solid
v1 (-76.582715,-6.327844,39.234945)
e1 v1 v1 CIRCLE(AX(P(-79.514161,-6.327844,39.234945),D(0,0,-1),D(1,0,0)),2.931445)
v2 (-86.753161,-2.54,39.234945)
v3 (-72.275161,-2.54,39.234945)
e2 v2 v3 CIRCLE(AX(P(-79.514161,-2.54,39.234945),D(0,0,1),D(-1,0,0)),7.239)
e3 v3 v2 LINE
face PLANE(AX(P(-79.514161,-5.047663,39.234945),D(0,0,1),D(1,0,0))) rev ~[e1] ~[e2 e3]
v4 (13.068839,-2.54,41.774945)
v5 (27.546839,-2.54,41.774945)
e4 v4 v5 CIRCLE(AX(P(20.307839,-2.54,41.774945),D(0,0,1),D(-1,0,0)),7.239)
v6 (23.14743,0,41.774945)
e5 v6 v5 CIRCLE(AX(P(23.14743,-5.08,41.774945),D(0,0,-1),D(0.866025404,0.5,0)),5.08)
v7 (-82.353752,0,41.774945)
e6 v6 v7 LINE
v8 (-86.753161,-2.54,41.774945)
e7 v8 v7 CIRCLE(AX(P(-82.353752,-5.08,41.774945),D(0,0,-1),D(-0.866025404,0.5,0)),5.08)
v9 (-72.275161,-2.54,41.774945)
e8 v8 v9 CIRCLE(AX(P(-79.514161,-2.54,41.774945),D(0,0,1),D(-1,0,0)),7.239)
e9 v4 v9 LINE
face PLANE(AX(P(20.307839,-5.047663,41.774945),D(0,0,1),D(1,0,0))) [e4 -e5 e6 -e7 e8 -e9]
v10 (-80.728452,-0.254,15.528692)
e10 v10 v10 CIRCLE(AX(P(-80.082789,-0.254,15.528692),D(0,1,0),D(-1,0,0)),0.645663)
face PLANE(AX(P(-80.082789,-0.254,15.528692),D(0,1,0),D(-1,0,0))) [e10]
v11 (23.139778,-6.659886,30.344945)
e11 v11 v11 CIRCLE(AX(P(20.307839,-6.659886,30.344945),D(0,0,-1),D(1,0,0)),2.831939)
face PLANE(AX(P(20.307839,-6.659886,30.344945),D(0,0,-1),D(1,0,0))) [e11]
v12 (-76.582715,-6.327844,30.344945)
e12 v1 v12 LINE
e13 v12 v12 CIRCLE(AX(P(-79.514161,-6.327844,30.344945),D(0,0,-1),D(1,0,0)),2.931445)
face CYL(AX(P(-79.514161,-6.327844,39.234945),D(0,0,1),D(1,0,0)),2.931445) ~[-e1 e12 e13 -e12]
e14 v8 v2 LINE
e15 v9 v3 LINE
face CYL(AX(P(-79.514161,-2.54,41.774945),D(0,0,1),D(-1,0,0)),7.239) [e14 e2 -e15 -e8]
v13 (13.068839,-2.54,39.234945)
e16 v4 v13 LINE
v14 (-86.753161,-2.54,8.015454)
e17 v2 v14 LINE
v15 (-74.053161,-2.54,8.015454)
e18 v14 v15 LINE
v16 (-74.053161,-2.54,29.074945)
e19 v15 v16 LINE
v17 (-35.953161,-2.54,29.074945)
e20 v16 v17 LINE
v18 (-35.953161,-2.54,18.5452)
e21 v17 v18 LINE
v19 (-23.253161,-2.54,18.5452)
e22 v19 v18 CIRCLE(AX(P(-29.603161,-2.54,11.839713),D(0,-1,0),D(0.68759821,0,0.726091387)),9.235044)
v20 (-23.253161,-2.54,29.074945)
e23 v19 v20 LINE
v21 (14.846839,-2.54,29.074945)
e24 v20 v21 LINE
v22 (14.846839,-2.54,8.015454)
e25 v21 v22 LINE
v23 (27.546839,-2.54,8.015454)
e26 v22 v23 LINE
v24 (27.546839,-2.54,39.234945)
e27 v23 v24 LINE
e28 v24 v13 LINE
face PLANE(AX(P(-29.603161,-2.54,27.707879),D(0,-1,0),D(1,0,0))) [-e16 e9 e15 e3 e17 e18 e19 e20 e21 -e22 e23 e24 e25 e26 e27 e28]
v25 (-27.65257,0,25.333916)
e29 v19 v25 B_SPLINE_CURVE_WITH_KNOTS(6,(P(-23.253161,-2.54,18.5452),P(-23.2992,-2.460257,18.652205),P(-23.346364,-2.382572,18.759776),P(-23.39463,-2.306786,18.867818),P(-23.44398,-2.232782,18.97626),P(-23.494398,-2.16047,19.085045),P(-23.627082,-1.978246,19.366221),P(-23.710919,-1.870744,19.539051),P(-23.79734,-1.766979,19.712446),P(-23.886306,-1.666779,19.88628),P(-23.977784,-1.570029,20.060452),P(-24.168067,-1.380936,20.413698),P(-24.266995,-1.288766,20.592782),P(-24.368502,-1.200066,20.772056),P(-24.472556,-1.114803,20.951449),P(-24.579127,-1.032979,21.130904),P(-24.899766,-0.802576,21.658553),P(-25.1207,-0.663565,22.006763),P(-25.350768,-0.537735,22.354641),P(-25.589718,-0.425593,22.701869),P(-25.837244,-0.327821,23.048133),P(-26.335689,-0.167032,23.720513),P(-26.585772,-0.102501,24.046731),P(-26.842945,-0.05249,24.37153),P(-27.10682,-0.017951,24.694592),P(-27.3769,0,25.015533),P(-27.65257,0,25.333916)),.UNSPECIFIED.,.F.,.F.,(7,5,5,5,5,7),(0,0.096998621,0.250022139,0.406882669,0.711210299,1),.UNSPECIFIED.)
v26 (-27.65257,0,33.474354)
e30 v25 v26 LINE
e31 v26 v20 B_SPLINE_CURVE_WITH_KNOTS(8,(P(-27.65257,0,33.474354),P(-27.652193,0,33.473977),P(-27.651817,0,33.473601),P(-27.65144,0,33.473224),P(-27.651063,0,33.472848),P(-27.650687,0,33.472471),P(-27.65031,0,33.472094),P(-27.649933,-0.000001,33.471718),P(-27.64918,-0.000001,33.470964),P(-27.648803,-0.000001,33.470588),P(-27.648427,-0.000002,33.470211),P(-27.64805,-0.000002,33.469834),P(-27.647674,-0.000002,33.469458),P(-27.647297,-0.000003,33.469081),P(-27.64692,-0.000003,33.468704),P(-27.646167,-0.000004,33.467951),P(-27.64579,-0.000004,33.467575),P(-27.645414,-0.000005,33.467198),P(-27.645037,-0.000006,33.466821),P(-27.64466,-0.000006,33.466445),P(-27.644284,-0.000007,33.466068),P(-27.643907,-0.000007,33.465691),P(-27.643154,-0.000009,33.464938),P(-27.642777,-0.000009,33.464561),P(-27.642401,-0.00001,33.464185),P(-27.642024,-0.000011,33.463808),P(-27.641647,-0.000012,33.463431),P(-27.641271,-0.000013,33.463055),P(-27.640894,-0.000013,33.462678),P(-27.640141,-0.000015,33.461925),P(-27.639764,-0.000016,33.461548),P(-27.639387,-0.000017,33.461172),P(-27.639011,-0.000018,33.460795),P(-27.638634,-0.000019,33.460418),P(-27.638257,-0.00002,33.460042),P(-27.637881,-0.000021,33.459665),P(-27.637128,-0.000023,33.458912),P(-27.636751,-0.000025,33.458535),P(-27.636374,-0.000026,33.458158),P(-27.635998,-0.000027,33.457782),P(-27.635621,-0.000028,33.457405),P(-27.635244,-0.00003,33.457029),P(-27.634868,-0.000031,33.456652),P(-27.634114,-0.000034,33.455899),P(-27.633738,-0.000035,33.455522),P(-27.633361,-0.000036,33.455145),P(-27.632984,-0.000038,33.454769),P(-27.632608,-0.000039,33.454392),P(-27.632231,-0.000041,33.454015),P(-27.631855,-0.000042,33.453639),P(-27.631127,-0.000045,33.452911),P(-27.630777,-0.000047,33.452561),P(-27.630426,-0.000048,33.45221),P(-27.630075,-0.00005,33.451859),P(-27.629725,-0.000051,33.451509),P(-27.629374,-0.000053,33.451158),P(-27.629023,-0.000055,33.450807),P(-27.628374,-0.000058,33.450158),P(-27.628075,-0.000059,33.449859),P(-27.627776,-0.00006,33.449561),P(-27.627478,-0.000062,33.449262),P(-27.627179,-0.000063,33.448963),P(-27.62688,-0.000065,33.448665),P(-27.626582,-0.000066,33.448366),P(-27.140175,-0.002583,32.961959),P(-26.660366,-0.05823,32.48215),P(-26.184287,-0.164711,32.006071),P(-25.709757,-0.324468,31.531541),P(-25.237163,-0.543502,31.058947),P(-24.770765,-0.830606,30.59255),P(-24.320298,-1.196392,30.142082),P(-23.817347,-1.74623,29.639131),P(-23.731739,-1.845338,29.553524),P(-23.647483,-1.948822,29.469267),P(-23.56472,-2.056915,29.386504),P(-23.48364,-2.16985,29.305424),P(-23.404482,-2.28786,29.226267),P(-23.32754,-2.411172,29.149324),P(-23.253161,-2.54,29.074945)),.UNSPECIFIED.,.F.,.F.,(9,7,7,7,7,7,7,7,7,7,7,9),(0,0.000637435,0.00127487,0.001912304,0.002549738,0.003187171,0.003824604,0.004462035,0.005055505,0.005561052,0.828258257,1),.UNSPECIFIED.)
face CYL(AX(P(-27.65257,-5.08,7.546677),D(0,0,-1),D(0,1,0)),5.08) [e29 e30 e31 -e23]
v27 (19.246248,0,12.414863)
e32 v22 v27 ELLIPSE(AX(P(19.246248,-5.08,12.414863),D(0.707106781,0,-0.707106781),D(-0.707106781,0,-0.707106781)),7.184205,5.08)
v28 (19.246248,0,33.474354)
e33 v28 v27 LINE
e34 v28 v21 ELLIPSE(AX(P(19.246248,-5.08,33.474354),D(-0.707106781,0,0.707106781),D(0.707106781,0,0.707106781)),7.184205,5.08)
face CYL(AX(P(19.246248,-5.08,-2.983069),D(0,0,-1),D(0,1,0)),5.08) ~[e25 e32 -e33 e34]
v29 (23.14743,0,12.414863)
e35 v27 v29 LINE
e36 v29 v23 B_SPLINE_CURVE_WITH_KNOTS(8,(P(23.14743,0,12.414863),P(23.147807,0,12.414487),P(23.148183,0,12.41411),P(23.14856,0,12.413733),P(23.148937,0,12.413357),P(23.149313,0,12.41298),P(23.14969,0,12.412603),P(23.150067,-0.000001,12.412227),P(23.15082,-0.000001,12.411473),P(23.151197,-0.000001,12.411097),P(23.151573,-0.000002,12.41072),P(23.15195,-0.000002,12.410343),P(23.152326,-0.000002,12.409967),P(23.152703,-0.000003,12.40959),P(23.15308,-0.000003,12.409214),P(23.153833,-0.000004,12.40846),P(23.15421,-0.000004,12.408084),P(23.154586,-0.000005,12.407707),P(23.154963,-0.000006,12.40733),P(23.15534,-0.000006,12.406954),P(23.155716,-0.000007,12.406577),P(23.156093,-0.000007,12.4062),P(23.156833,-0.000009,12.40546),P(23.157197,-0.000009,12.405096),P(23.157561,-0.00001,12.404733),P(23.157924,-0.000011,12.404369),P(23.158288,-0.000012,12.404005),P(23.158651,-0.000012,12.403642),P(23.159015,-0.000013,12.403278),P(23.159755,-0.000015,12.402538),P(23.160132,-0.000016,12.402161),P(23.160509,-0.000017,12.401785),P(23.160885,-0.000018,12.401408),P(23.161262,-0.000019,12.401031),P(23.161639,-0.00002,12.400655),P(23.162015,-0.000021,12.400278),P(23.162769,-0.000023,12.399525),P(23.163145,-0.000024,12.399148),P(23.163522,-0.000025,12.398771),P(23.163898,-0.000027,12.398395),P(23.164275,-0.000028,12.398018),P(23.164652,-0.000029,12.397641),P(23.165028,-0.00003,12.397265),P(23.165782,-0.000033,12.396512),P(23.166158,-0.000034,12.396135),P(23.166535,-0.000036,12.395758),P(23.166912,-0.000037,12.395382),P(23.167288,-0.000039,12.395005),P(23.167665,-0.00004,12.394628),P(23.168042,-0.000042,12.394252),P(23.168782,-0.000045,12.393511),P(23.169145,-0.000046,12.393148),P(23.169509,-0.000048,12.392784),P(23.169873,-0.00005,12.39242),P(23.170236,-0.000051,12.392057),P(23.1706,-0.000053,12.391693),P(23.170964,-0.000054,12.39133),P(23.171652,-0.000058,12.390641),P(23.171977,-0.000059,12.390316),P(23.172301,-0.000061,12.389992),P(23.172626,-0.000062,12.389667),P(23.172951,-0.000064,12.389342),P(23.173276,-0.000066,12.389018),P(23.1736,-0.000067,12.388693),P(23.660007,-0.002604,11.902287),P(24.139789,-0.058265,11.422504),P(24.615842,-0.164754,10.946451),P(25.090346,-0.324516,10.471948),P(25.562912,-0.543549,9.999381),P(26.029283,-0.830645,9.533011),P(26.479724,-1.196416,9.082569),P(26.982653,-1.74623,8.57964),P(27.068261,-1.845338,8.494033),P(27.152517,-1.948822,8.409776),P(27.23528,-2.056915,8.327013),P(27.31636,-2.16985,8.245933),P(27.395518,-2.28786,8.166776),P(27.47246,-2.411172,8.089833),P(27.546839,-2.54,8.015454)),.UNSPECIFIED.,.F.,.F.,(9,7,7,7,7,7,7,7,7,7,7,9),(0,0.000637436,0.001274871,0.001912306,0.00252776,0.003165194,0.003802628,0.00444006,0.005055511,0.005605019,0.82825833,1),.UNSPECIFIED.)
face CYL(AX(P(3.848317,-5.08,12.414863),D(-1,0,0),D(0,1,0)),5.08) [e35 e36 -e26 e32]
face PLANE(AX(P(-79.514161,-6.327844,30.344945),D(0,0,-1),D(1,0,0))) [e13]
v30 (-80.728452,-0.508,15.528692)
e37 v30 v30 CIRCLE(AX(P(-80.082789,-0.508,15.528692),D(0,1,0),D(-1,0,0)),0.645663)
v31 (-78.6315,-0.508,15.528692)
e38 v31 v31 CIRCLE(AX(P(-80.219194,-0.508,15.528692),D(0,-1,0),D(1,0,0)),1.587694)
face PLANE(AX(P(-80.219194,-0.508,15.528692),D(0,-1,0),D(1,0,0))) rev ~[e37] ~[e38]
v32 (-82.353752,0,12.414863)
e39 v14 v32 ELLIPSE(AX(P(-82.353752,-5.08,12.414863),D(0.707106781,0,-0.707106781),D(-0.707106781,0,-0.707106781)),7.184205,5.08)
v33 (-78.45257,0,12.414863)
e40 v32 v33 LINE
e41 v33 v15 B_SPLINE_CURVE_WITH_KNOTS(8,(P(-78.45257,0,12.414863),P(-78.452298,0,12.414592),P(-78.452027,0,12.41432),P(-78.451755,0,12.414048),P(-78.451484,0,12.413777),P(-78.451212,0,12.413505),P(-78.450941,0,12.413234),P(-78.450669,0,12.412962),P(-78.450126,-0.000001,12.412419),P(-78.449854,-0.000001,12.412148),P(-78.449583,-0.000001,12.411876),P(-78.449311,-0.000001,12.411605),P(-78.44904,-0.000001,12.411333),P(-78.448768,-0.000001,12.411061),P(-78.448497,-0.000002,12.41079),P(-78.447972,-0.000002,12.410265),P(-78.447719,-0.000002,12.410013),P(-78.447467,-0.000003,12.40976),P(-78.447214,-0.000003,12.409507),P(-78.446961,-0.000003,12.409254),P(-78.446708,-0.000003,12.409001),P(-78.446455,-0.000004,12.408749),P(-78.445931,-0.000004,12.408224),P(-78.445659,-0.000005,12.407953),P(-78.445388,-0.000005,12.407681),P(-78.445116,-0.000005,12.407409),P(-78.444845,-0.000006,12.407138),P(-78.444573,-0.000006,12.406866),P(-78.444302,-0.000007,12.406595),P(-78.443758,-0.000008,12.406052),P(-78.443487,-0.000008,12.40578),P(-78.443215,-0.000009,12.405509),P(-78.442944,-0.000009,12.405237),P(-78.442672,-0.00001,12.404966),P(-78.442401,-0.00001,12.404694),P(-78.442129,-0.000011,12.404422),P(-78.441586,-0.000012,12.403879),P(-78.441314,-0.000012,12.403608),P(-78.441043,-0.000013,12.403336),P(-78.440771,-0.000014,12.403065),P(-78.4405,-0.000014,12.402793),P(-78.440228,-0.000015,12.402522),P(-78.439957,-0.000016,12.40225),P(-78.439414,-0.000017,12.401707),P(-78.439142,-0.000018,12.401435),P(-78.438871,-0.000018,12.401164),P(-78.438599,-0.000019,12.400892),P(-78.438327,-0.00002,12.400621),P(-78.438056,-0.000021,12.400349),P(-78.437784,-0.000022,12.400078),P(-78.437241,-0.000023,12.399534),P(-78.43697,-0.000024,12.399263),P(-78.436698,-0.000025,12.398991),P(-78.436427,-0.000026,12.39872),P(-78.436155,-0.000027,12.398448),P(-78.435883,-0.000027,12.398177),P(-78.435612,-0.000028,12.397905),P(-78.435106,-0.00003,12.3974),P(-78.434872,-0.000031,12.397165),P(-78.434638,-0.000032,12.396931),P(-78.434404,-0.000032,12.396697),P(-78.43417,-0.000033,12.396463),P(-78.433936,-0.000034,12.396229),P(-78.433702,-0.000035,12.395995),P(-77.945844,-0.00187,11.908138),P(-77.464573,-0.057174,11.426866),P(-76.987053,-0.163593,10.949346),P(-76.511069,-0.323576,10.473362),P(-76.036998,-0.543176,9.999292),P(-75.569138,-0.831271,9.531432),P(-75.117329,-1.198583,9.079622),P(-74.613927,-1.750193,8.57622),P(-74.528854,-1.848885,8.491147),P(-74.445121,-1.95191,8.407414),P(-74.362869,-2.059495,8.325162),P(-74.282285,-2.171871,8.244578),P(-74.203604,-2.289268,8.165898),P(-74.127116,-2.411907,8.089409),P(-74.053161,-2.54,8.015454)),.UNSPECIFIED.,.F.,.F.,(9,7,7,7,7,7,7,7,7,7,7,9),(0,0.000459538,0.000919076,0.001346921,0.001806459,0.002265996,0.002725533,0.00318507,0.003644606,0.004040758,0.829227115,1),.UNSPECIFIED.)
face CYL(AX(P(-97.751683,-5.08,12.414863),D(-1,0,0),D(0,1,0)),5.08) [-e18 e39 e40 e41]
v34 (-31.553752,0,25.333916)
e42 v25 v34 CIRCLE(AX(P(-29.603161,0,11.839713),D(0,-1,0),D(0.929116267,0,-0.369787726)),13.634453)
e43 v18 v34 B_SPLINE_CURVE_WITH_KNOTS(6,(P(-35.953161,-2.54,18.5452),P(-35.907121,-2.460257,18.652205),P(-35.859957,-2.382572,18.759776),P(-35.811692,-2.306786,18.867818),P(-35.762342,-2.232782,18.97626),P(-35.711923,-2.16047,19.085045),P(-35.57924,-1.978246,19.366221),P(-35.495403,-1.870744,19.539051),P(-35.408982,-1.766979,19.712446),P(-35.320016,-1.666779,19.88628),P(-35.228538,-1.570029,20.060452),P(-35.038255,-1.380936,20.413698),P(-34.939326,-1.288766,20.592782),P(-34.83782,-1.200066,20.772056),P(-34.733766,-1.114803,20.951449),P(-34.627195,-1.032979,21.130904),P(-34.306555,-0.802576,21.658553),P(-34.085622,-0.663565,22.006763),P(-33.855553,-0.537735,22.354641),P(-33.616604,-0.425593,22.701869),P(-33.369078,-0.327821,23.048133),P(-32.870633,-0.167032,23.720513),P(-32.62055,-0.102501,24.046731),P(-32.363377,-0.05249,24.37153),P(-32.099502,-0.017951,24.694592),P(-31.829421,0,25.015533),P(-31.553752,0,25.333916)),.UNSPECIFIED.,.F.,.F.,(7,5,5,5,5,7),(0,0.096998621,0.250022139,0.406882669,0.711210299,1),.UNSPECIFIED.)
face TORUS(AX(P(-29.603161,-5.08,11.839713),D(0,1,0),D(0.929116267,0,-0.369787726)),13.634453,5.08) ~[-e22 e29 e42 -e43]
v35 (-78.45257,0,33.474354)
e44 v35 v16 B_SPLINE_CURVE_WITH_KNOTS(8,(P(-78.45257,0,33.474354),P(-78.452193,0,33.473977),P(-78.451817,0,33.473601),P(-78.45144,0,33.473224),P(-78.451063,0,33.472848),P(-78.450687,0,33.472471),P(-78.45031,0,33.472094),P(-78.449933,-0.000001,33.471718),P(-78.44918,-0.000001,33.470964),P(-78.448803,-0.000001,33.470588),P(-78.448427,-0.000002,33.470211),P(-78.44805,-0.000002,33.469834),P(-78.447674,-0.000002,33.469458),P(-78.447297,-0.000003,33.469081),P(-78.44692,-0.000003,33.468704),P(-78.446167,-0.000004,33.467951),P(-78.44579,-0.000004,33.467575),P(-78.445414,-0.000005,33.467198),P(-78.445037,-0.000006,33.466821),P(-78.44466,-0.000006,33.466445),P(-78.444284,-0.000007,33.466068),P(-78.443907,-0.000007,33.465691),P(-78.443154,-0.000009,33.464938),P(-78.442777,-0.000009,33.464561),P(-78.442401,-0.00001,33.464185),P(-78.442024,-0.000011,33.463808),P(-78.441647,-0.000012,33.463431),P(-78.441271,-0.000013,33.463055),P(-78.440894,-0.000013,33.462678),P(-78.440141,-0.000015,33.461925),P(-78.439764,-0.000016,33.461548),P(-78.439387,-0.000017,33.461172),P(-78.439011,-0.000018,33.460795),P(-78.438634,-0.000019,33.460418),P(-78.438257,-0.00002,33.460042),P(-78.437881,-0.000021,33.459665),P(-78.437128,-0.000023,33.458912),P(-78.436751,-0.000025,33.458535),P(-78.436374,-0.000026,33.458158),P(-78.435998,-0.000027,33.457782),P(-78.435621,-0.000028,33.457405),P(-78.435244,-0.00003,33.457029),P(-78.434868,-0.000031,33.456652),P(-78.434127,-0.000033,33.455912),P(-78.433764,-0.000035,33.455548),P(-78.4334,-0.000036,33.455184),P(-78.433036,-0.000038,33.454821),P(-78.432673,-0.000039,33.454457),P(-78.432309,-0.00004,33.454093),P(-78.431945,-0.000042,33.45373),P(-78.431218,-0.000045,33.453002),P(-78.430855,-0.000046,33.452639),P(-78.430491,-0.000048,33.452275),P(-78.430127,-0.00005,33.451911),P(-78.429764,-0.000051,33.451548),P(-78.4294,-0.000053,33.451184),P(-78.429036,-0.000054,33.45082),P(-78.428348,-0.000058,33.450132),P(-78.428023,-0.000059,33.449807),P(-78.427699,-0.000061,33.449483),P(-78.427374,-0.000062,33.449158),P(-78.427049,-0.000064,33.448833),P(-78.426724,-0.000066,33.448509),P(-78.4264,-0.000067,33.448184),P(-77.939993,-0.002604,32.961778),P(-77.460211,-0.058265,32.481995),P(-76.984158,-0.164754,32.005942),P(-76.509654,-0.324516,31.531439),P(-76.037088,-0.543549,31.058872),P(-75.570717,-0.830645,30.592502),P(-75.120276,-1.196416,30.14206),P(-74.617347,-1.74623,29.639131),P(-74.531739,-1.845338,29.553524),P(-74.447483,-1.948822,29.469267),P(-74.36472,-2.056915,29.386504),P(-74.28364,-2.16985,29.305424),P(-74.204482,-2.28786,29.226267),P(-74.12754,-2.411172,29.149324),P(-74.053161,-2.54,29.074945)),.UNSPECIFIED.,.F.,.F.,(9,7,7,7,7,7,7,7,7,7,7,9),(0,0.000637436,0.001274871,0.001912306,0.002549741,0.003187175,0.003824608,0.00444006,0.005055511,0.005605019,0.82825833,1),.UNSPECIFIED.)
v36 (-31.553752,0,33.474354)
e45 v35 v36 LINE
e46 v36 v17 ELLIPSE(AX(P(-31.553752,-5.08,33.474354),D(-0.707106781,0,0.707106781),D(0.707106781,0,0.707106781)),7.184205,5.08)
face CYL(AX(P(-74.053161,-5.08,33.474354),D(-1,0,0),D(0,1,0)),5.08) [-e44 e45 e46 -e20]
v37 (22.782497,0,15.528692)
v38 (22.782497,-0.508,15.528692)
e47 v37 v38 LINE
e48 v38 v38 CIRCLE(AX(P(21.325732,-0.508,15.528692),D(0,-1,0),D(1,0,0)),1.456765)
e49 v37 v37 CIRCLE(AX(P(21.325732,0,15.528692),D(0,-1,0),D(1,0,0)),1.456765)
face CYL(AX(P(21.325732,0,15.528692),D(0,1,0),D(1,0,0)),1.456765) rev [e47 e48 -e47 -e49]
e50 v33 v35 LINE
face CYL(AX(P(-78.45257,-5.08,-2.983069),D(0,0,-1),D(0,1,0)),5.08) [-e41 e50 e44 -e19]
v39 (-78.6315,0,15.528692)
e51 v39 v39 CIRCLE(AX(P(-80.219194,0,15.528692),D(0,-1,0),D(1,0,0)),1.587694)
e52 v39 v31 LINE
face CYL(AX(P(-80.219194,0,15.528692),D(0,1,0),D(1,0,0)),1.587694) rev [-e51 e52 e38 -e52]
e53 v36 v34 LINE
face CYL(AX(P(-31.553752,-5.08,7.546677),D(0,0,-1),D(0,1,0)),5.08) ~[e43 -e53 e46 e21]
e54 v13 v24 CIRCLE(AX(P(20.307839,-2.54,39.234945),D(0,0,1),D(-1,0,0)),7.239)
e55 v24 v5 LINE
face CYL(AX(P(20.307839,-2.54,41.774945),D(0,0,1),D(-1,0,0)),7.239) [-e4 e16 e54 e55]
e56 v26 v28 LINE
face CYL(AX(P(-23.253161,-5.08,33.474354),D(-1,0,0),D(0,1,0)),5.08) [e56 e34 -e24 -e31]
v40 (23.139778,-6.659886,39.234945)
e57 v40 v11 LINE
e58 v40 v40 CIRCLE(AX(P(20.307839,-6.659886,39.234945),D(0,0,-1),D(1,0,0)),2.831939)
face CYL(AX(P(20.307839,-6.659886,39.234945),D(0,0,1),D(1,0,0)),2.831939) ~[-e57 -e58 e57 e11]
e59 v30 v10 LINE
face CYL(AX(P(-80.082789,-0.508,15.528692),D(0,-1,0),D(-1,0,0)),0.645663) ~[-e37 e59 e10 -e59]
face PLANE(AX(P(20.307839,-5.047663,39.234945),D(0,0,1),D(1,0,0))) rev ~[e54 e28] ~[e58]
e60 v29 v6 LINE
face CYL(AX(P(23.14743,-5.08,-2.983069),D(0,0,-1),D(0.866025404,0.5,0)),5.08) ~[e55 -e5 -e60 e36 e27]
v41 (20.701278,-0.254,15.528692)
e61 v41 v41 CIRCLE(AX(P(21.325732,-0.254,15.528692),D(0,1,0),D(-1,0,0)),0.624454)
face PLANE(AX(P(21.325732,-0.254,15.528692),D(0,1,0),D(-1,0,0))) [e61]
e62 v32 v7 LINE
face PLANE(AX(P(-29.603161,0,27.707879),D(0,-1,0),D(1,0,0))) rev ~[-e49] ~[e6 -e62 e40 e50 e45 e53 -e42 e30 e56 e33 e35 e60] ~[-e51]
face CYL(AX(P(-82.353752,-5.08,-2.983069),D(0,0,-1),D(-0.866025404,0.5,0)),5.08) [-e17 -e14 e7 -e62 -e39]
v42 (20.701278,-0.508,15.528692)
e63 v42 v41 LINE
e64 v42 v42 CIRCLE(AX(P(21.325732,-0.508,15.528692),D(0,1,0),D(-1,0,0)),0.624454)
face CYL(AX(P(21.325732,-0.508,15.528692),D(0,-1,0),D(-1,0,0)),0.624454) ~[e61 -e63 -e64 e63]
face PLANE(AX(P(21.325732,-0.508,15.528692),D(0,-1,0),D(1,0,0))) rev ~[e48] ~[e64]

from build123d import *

# Parameters (mm, degrees)
F1_DEPTH     = 2.54
F3_DEPTH     = 2.54
F4_R         = 2.9314454593
F5_R         = 2.8319389427
F6_DEPTH     = 8.89
F8_DEPTH     = 25.4
F9_T1_DEPTH  = 38.1
F9_T3_DEPTH  = 38.1
F9_T5_DEPTH  = 21.5282681004
F9_T7_DEPTH  = 32.0580135728
F9_T9_DEPTH  = 55.7565362009
F9_T11_DEPTH = 34.6970452561
F9_T13_DEPTH = 34.6970452561
F9_T16_ANGLE = 223.4050528115
F9_T21_DEPTH = 49.0985226281
F9_T25_DEPTH = 32.5267907285
F9_T32_DEPTH = 32.0580135728
F9_T37_DEPTH = 49.0985226281
F9_T44_DEPTH = 49.0985226281
F9_T48_DEPTH = 32.0580135728
F9_T56_DEPTH = 32.5267907285
F9_T60_DEPTH = 49.0985226281
F10_R        = 1.4567648878
F10_R_2      = 1.5876943873
F11_DEPTH    = 0.508
F12_R        = 0.6244535606
F12_R_2      = 0.645662674
F13_DEPTH    = 0.254


# Not quite as in the source:
# - a fillet or chamfer that OpenCascade refuses, or shapes differently, is made with other operations: its cross-section is extruded or revolved along the edge and cut away or added


with BuildPart() as f1:
    # F0 (on Front) → F1 (new body)
    with BuildSketch(Plane.XZ):
        Polygon((27.5468391635, 41.7749450469), (-86.7531608365, 41.7749450469), (-86.7531608365, 8.0154541022), (-74.0531608365, 8.0154541022), (-74.0531608365, 29.0749450469), (-35.9531608365, 29.0749450469), (-35.9531608365, 8.0154541022), (-23.2531608365, 8.0154541022), (-23.2531608365, 29.0749450469), (14.8468391635, 29.0749450469), (14.8468391635, 8.0154541022), (27.5468391635, 8.0154541022), align=None)
    extrude(amount=F1_DEPTH)

    # F2 (on face) → F3 (join)
    with BuildSketch(Plane.XY.offset(41.7749450469)):
        with BuildLine():
            Line((27.5468391635, -2.54), (13.0688391635, -2.54))
            ThreePointArc((13.0688391635, -2.54), (20.3078391635, -9.779), (27.5468391635, -2.54))
        make_face()
        with BuildLine():
            Line((-72.2751608365, -2.54), (-86.7531608365, -2.54))
            ThreePointArc((-86.7531608365, -2.54), (-79.5141608365, -9.779), (-72.2751608365, -2.54))
        make_face()
    extrude(amount=-F3_DEPTH)

    # F4 (on face) + F5 (on face) → F6 (join)
    with BuildSketch(Plane(origin=(0, 0, 39.2349450469), x_dir=(1, 0, 0), z_dir=(0, 0, -1))):
        with Locations((-79.5141608365, 6.3278437592)):
            Circle(F4_R)
    with BuildSketch(Plane(origin=(0, 0, 39.2349450469), x_dir=(1, 0, 0), z_dir=(0, 0, -1))):
        with Locations((20.3078391635, 6.6598863341)):
            Circle(F5_R)
    extrude(amount=F6_DEPTH)

    # F7 (on face) → F8 (cut)
    with BuildSketch(Plane.XZ.offset(2.54)):
        with BuildLine():
            Line((-23.2531608365, 8.0154541022), (-23.2531608365, 18.5451995745))
            ThreePointArc((-23.2531608365, 18.5451995745), (-29.6031608365, 21.0747577819), (-35.9531608365, 18.5451995745))
            Line((-35.9531608365, 18.5451995745), (-35.9531608365, 8.0154541022))
            Line((-35.9531608365, 8.0154541022), (-23.2531608365, 8.0154541022))
        make_face()
    extrude(amount=-F8_DEPTH, mode=Mode.SUBTRACT)

    # F9: fillet of radius 5.08 on 11 edges, made by hand

    # F9_s2 → F9_t1 (cut)
    with BuildSketch(Plane.YZ.offset(-23.2531608365)):
        with BuildLine():
            ThreePointArc((0, 33.4743540981), (-0.6805909488, 30.9343540981), (-2.54, 29.0749450469))
            Line((-2.54, 29.0749450469), (0, 29.0749450469))
            Line((0, 29.0749450469), (0, 33.4743540981))
        make_face()
    extrude(amount=F9_T1_DEPTH, mode=Mode.SUBTRACT)

    # F9_s4 → F9_t3 (cut)
    with BuildSketch(Plane.YZ.offset(-74.0531608365)):
        with BuildLine():
            ThreePointArc((0, 33.4743540981), (-0.6805909488, 30.9343540981), (-2.54, 29.0749450469))
            Line((-2.54, 29.0749450469), (0, 29.0749450469))
            Line((0, 29.0749450469), (0, 33.4743540981))
        make_face()
    extrude(amount=F9_T3_DEPTH, mode=Mode.SUBTRACT)

    # F9_s6 → F9_t5 (cut)
    with BuildSketch(Plane.XY.offset(7.5466769465)):
        with BuildLine():
            ThreePointArc((-31.5537517853, 0), (-34.0937517853, -0.6805909488), (-35.9531608365, -2.54))
            Line((-35.9531608365, -2.54), (-35.9531608365, 0))
            Line((-35.9531608365, 0), (-31.5537517853, 0))
        make_face()
        with BuildLine():
            ThreePointArc((-27.6525698878, 0), (-25.1125698878, -0.6805909488), (-23.2531608365, -2.54))
            Line((-23.2531608365, -2.54), (-23.2531608365, 0))
            Line((-23.2531608365, 0), (-27.6525698878, 0))
        make_face()
    extrude(amount=F9_T5_DEPTH, mode=Mode.SUBTRACT)

    # F9_s8 → F9_t7 (cut)
    with BuildSketch(Plane.XY.offset(-2.9830685259)):
        with BuildLine():
            ThreePointArc((19.2462482147, 0), (16.7062482147, -0.6805909488), (14.8468391635, -2.54))
            Line((14.8468391635, -2.54), (14.8468391635, 0))
            Line((14.8468391635, 0), (19.2462482147, 0))
        make_face()
        with BuildLine():
            ThreePointArc((-78.4525698878, 0), (-75.9125698878, -0.6805909488), (-74.0531608365, -2.54))
            Line((-74.0531608365, -2.54), (-74.0531608365, 0))
            Line((-74.0531608365, 0), (-78.4525698878, 0))
        make_face()
    extrude(amount=F9_T7_DEPTH, mode=Mode.SUBTRACT)

    # F9_s10 → F9_t9 (cut)
    with BuildSketch(Plane.XY.offset(-2.9830685259)):
        with BuildLine():
            ThreePointArc((27.5468391635, -2.54), (25.6874301122, -0.6805909488), (23.1474301122, 0))
            Line((23.1474301122, 0), (27.5468391635, 0))
            Line((27.5468391635, 0), (27.5468391635, -2.54))
        make_face()
        with BuildLine():
            ThreePointArc((-86.7531608365, -2.54), (-84.8937517853, -0.6805909488), (-82.3537517853, 0))
            Line((-82.3537517853, 0), (-86.7531608365, 0))
            Line((-86.7531608365, 0), (-86.7531608365, -2.54))
        make_face()
    extrude(amount=F9_T9_DEPTH, mode=Mode.SUBTRACT)

    # F9_s12 → F9_t11 (cut)
    with BuildSketch(Plane.YZ.offset(-97.7516834646)):
        with BuildLine():
            ThreePointArc((0, 12.4148631534), (-0.6805909488, 9.8748631534), (-2.54, 8.0154541022))
            Line((-2.54, 8.0154541022), (0, 8.0154541022))
            Line((0, 8.0154541022), (0, 12.4148631534))
        make_face()
    extrude(amount=F9_T11_DEPTH, mode=Mode.SUBTRACT)

    # F9_s14 → F9_t13 (cut)
    with BuildSketch(Plane.YZ.offset(3.8483165354)):
        with BuildLine():
            ThreePointArc((0, 12.4148631534), (-0.6805909488, 9.8748631534), (-2.54, 8.0154541022))
            Line((-2.54, 8.0154541022), (0, 8.0154541022))
            Line((0, 8.0154541022), (0, 12.4148631534))
        make_face()
    extrude(amount=F9_T13_DEPTH, mode=Mode.SUBTRACT)

    # F9_s15 → F9_t16 (revolve, cut)
    with BuildSketch(Plane(origin=(0.0198149882, 0, 0.0497864763), x_dir=(0, 1, 0), z_dir=(-0.3697877262, 0, -0.929116267))):
        with BuildLine():
            ThreePointArc((0, -18.2485055237), (-0.6805909488, -20.7885055237), (-2.54, -22.6479145749))
            Line((-2.54, -22.6479145749), (0, -22.6479145749))
            Line((0, -22.6479145749), (0, -18.2485055237))
        make_face()
    revolve(axis=Axis((-29.6031608365, 0, 11.8397133801), (0, -1, 0)), revolution_arc=F9_T16_ANGLE, mode=Mode.SUBTRACT)


with BuildPart() as f9_tool19:
    # F9_s20 → F9_t21 (new body)
    with BuildSketch(Plane.YZ.offset(-34.2516834646)):
        with BuildLine():
            ThreePointArc((0, 33.4743540981), (-0.6805909488, 30.9343540981), (-2.54, 29.0749450469))
            Line((-2.54, 29.0749450469), (0, 29.0749450469))
            Line((0, 29.0749450469), (0, 33.4743540981))
        make_face()
    extrude(amount=F9_T21_DEPTH)

    split(bisect_by=Plane.YZ.offset(-23.2531608365), keep=Keep.BOTTOM)


with BuildPart() as f9_tool23:
    # F9_s24 → F9_t25 (new body)
    with BuildSketch(Plane.XY.offset(7.5466769465)):
        with BuildLine():
            ThreePointArc((-27.6525698878, 0), (-25.1125698878, -0.6805909488), (-23.2531608365, -2.54))
            Line((-23.2531608365, -2.54), (-23.2531608365, 0))
            Line((-23.2531608365, 0), (-27.6525698878, 0))
        make_face()
    extrude(amount=F9_T25_DEPTH)

    split(bisect_by=Plane.XY.offset(29.0749450469), keep=Keep.TOP)


with BuildPart() as f9_tool19_1:
    add(f9_tool19.part)

    # F9_t27: intersect F9_tool23
    add(f9_tool23.part, mode=Mode.INTERSECT)


with BuildPart() as f1_1:
    add(f1.part)

    # F9_t17: cut F9_tool19
    add(f9_tool19_1.part, mode=Mode.SUBTRACT)


with BuildPart() as f9_tool30:
    # F9_s31 → F9_t32 (new body)
    with BuildSketch(Plane.XY.offset(40.073467675)):
        with BuildLine():
            ThreePointArc((19.2462482147, 0), (16.7062482147, -0.6805909488), (14.8468391635, -2.54))
            Line((14.8468391635, -2.54), (14.8468391635, 0))
            Line((14.8468391635, 0), (19.2462482147, 0))
        make_face()
    extrude(amount=-F9_T32_DEPTH)

    split(bisect_by=Plane.XY.offset(39.2349450469), keep=Keep.BOTTOM)

    split(bisect_by=Plane.XY.offset(29.0749450469), keep=Keep.TOP)


with BuildPart() as f9_tool35:
    # F9_s36 → F9_t37 (new body)
    with BuildSketch(Plane.YZ.offset(-23.2531608365)):
        with BuildLine():
            ThreePointArc((0, 33.4743540981), (-0.6805909488, 30.9343540981), (-2.54, 29.0749450469))
            Line((-2.54, 29.0749450469), (0, 29.0749450469))
            Line((0, 29.0749450469), (0, 33.4743540981))
        make_face()
    extrude(amount=F9_T37_DEPTH)

    split(bisect_by=Plane.YZ.offset(14.8468391635), keep=Keep.TOP)


with BuildPart() as f9_tool30_1:
    add(f9_tool30.part)

    # F9_t39: intersect F9_tool35
    add(f9_tool35.part, mode=Mode.INTERSECT)


with BuildPart() as f1_2:
    add(f1_1.part)

    # F9_t28: cut F9_tool30
    add(f9_tool30_1.part, mode=Mode.SUBTRACT)


with BuildPart() as f9_tool42:
    # F9_s43 → F9_t44 (new body)
    with BuildSketch(Plane.YZ.offset(-85.0516834646)):
        with BuildLine():
            ThreePointArc((0, 33.4743540981), (-0.6805909488, 30.9343540981), (-2.54, 29.0749450469))
            Line((-2.54, 29.0749450469), (0, 29.0749450469))
            Line((0, 29.0749450469), (0, 33.4743540981))
        make_face()
    extrude(amount=F9_T44_DEPTH)

    split(bisect_by=Plane.YZ.offset(-74.0531608365), keep=Keep.BOTTOM)


with BuildPart() as f9_tool46:
    # F9_s47 → F9_t48 (new body)
    with BuildSketch(Plane.XY.offset(8.0154541022)):
        with BuildLine():
            ThreePointArc((-78.4525698878, 0), (-75.9125698878, -0.6805909488), (-74.0531608365, -2.54))
            Line((-74.0531608365, -2.54), (-74.0531608365, 0))
            Line((-74.0531608365, 0), (-78.4525698878, 0))
        make_face()
    extrude(amount=F9_T48_DEPTH)

    split(bisect_by=Plane.XY.offset(29.0749450469), keep=Keep.TOP)

    split(bisect_by=Plane.XY.offset(39.2349450469), keep=Keep.BOTTOM)


with BuildPart() as f9_tool42_1:
    add(f9_tool42.part)

    # F9_t51: intersect F9_tool46
    add(f9_tool46.part, mode=Mode.INTERSECT)


with BuildPart() as f1_3:
    add(f1_2.part)

    # F9_t40: cut F9_tool42
    add(f9_tool42_1.part, mode=Mode.SUBTRACT)


with BuildPart() as f9_tool54:
    # F9_s55 → F9_t56 (new body)
    with BuildSketch(Plane.XY.offset(40.073467675)):
        with BuildLine():
            ThreePointArc((-31.5537517853, 0), (-34.0937517853, -0.6805909488), (-35.9531608365, -2.54))
            Line((-35.9531608365, -2.54), (-35.9531608365, 0))
            Line((-35.9531608365, 0), (-31.5537517853, 0))
        make_face()
    extrude(amount=-F9_T56_DEPTH)

    split(bisect_by=Plane.XY.offset(29.0749450469), keep=Keep.TOP)


with BuildPart() as f9_tool58:
    # F9_s59 → F9_t60 (new body)
    with BuildSketch(Plane.YZ.offset(-74.0531608365)):
        with BuildLine():
            ThreePointArc((0, 33.4743540981), (-0.6805909488, 30.9343540981), (-2.54, 29.0749450469))
            Line((-2.54, 29.0749450469), (0, 29.0749450469))
            Line((0, 29.0749450469), (0, 33.4743540981))
        make_face()
    extrude(amount=F9_T60_DEPTH)

    split(bisect_by=Plane.YZ.offset(-35.9531608365), keep=Keep.TOP)


with BuildPart() as f9_tool54_1:
    add(f9_tool54.part)

    # F9_t62: intersect F9_tool58
    add(f9_tool58.part, mode=Mode.INTERSECT)


with BuildPart() as f1_4:
    add(f1_3.part)

    # F9_t52: cut F9_tool54
    add(f9_tool54_1.part, mode=Mode.SUBTRACT)

    # F10 (on Front) → F11 (cut)
    with BuildSketch(Plane.XZ):
        with Locations((21.32573165, 15.5286919326)):
            Circle(F10_R)
        with Locations((-80.219194293, 15.5286919326)):
            Circle(F10_R_2)
    extrude(amount=F11_DEPTH, mode=Mode.SUBTRACT)

    # F12 (on face) → F13 (join)
    with BuildSketch(Plane(origin=(0, -0.508, 0), x_dir=(-1, 0, 0), z_dir=(0, 1, 0))):
        with Locations((-21.32573165, 15.5286919326)):
            Circle(F12_R)
        with Locations((80.0827890635, 15.5286919326)):
            Circle(F12_R_2)
    extrude(amount=F13_DEPTH)


solid = f1_4.part
